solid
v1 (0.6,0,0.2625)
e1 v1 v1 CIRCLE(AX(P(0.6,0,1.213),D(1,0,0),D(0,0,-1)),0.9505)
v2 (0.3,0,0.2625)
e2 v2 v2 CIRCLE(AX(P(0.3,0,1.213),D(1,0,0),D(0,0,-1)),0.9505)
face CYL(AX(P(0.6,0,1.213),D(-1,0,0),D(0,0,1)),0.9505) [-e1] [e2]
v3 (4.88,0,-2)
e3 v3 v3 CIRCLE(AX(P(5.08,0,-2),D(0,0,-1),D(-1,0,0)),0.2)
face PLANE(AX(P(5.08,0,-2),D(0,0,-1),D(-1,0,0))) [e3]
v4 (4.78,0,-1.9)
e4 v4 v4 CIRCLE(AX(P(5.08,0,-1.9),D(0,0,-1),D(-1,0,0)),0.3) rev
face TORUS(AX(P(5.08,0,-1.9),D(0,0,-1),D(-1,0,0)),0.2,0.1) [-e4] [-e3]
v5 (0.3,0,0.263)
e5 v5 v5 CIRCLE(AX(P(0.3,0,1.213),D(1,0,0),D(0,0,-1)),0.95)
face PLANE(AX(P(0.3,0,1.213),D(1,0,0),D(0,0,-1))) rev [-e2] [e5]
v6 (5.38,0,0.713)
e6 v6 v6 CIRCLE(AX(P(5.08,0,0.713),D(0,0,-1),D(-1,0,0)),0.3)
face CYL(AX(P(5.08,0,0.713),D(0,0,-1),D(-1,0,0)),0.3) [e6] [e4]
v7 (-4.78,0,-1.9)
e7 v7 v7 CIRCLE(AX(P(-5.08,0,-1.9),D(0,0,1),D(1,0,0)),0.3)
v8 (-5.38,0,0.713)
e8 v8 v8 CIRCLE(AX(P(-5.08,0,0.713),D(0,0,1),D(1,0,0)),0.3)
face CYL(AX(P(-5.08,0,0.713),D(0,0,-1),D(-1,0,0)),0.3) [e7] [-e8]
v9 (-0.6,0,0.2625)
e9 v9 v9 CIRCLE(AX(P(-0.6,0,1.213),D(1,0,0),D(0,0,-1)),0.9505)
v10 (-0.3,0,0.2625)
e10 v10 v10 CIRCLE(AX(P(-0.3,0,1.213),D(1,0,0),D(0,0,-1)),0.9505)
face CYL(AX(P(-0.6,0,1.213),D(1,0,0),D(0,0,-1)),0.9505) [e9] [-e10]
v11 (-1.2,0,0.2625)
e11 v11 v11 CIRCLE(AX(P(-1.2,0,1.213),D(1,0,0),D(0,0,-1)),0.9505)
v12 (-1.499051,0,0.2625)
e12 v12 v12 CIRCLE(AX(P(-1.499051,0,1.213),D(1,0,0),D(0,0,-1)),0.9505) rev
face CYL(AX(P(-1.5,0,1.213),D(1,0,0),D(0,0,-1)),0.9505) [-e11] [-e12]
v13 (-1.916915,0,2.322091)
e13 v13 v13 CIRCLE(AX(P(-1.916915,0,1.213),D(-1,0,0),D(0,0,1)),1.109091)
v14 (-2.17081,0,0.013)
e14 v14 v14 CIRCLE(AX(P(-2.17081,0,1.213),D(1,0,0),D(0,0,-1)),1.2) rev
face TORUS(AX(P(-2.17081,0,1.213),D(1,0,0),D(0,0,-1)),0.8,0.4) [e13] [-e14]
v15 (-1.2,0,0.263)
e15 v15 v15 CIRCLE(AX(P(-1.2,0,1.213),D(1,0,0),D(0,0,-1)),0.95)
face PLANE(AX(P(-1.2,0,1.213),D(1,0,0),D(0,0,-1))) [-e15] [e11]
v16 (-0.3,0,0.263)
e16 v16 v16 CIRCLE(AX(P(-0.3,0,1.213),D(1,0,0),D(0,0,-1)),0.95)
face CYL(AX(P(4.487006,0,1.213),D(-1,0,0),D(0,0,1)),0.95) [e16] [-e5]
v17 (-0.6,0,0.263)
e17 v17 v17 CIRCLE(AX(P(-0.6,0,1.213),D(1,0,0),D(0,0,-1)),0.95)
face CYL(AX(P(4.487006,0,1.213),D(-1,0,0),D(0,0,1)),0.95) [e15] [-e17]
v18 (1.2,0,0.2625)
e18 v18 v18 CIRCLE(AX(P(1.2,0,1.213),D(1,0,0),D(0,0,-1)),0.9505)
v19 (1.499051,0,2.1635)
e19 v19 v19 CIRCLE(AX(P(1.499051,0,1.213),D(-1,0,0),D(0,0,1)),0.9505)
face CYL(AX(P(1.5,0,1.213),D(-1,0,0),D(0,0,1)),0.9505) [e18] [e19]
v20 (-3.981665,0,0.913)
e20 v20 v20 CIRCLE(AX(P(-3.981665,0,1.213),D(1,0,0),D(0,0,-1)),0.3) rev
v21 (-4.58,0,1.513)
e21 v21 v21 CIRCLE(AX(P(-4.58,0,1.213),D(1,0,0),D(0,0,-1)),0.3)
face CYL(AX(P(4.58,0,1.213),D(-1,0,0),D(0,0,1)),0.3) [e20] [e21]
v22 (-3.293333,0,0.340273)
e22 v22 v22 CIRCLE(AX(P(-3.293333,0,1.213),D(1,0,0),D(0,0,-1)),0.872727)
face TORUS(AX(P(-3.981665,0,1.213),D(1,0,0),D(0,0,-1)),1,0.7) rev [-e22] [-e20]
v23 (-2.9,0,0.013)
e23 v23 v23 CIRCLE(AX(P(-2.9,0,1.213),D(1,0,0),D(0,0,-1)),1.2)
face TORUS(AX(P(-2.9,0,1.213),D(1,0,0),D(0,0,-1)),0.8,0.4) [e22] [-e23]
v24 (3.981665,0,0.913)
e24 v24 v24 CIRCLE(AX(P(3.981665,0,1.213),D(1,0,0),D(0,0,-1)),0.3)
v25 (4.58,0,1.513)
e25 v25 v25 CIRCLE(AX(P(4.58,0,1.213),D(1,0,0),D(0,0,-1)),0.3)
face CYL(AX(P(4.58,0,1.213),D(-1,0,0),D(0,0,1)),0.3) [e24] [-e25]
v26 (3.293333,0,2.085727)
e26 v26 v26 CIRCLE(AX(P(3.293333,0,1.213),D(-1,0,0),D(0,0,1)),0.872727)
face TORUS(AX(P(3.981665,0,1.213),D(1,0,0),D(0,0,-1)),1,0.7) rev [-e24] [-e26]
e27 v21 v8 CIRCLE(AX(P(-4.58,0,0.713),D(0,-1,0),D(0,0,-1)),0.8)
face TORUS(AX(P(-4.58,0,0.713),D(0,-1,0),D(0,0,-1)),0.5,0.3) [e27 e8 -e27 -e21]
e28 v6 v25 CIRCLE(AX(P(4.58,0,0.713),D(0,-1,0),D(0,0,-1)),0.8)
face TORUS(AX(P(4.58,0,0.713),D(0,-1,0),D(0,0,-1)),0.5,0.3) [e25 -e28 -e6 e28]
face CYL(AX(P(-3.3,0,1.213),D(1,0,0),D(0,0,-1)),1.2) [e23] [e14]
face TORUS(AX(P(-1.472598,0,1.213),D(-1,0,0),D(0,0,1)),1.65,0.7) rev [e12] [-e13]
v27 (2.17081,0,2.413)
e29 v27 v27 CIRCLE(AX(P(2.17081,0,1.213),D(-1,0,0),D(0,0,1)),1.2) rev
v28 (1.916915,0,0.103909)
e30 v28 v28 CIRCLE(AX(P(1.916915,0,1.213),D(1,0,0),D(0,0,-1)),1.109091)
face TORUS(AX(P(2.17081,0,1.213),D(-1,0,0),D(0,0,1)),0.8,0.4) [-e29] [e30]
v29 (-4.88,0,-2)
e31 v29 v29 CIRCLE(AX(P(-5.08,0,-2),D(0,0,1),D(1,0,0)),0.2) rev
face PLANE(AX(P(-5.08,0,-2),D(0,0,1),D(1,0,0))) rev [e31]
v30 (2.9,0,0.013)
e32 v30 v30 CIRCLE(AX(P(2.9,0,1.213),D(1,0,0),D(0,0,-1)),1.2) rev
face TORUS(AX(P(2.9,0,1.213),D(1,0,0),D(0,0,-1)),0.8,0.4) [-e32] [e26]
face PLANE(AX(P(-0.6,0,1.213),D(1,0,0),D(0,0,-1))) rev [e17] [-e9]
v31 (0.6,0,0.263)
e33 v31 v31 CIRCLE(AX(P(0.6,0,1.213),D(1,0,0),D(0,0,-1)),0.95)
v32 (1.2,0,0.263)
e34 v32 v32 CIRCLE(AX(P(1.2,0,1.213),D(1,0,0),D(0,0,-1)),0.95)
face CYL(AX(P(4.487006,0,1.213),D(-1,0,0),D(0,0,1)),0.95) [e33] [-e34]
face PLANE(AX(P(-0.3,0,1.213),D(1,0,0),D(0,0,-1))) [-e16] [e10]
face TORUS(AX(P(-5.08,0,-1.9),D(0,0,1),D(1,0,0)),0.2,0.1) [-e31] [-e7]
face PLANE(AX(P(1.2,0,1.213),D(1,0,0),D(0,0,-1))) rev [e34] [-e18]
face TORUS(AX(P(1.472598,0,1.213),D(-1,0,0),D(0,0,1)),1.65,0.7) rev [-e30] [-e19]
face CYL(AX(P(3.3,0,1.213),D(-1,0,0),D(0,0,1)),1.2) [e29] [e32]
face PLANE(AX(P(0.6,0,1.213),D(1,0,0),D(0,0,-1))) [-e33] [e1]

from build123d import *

# Parameters (mm, degrees)
IZIM2_R                                 = 0.3000000000000001
RADYUS4_R                               = 0.1
Y_KSEKLIK_EKSTR_ZYON2_START             = 2.55
IZIM4_R                                 = 1.2
Y_KSEKLIK_EKSTR_ZYON2_DEPTH             = 0.75
Y_KSEKLIK_EKSTR_ZYON3_START             = -2.55
IZIM4_3_R                               = 1.2
Y_KSEKLIK_EKSTR_ZYON3_DEPTH             = 0.75
Y_KSEKLIK_EKSTR_ZYON4_REACH             = 8.017
IZIM4_4_R                               = 0.95
Y_KSEKLIK_EKSTR_ZYON4_DIRECTION_2_REACH = 8.017
RADYUS1_R                               = 0.4
RADYUS2_R                               = 0.7
RADYUS3_R                               = 0.7
EKSTR_ZYON_NCE1_START                   = 1.2
IZIM4_5_R                               = 0.9504999999999999
IZIM4_5_R_2                             = 0.8494999999999999
EKSTR_ZYON_NCE1_DEPTH                   = 0.3
EKSTR_ZYON_NCE2_START                   = 0.6
IZIM4_7_R                               = 0.9504999999999999
IZIM4_7_R_2                             = 0.8494999999999999
EKSTR_ZYON_NCE2_DEPTH                   = 0.3
EKSTR_ZYON_NCE3_START                   = -0.3
IZIM4_9_R                               = 0.9504999999999999
IZIM4_9_R_2                             = 0.8494999999999999
EKSTR_ZYON_NCE3_DEPTH                   = 0.3
EKSTR_ZYON_NCE4_START                   = -1.2
IZIM4_10_R                              = 0.9504999999999999
IZIM4_10_R_2                            = 0.8494999999999999
EKSTR_ZYON_NCE4_DEPTH                   = 0.3


with BuildPart() as part:
    # Süpür2: sweep along a path in Çizim3
    with BuildLine(Plane(origin=(0, 0, 0), x_dir=(1, 0, 0), z_dir=(0, 1, 0))) as s_p_r2_path:
        Line((5.080000000000001, 2.0000000000000355), (5.080000000000001, -0.7129999999999246))
        ThreePointArc((5.080000000000001, -0.7129999999999246), (4.9335533905933, -1.0665533905932438), (4.580000000000001, -1.2129999999999947))
        Line((4.580000000000001, -1.2129999999999947), (-4.580000000000001, -1.2129999999999959))
        ThreePointArc((-4.580000000000001, -1.2129999999999959), (-4.933553390593275, -1.0665533905932696), (-5.080000000000001, -0.712999999999996))
        Line((-5.080000000000001, -0.712999999999996), (-5.080000000000001, 1.9999999999999645))
    # Çizim2 → Süpür2 (sweep)
    with BuildSketch(Plane(origin=(0, 0, -2), x_dir=(-1, 0, 6.98e-15), z_dir=(-6.98e-15, 0, -1))):
        with Locations((-5.080000000000001, 0)):
            Circle(IZIM2_R)
    sweep(path=s_p_r2_path.line)

    # Radyus4
    radyus4_edges = [part.edges().sort_by_distance(p)[0] for p in [
        (5.380000000000001, -4e-17, -2.0000000000000355),
        (-5.380000000000001, -4e-17, -1.9999999999999645),
    ]]
    fillet(radyus4_edges, radius=RADYUS4_R)

    # Çizim4 → Yükseklik-Ekstrüzyon2 (add, symmetric)
    with BuildSketch(Plane(origin=(0, 0, 0), x_dir=(0, 0, -1), z_dir=(1, 0, 0)).offset(Y_KSEKLIK_EKSTR_ZYON2_START)):
        with Locations((-1.2129999999999959, 0)):
            Circle(IZIM4_R)
    extrude(amount=Y_KSEKLIK_EKSTR_ZYON2_DEPTH, both=True)

    # Çizim4<3> → Yükseklik-Ekstrüzyon3 (add, symmetric)
    with BuildSketch(Plane(origin=(0, 0, 0), x_dir=(0, 0, -1), z_dir=(1, 0, 0)).offset(Y_KSEKLIK_EKSTR_ZYON3_START)):
        with Locations((-1.2129999999999959, 0)):
            Circle(IZIM4_3_R)
    extrude(amount=Y_KSEKLIK_EKSTR_ZYON3_DEPTH, both=True)

    # Yükseklik-Ekstrüzyon4: up to this face of the body (flat: up to its plane)
    y_kseklik_ekstr_zyon4_end = Plane(part.part.faces().sort_by_distance((1.8, 0, 2.379058875))[0])
    # Çizim4<4> → Yükseklik-Ekstrüzyon4 (add, up to the picked face)
    with BuildSketch(Plane(origin=(0, 0, 0), x_dir=(0, 0, -1), z_dir=(1, 0, 0)), mode=Mode.PRIVATE) as y_kseklik_ekstr_zyon4_sk1:
        with Locations((-1.2129999999999959, 0)):
            Circle(IZIM4_4_R)
    y_kseklik_ekstr_zyon4_tool1 = split(extrude(y_kseklik_ekstr_zyon4_sk1.sketch, amount=Y_KSEKLIK_EKSTR_ZYON4_REACH, mode=Mode.PRIVATE), bisect_by=y_kseklik_ekstr_zyon4_end, keep=Keep.BOTH, mode=Mode.PRIVATE)
    add(y_kseklik_ekstr_zyon4_tool1.solids().sort_by(Axis((0, 0, 1.213), (1, 0, 0)))[0])

    # Yükseklik-Ekstrüzyon4 direction 2: up to this face of the body (flat: up to its plane)
    y_kseklik_ekstr_zyon4_direction_2_end = Plane(part.part.faces().sort_by_distance((-1.8, 0, 2.379058875))[0])
    # Çizim4<4> → Yükseklik-Ekstrüzyon4 direction 2 (add, up to the picked face)
    with BuildSketch(Plane(origin=(0, 0, 0), x_dir=(0, 0, -1), z_dir=(1, 0, 0)), mode=Mode.PRIVATE) as y_kseklik_ekstr_zyon4_direction_2_sk1:
        with Locations((-1.2129999999999959, 0)):
            Circle(IZIM4_4_R)
    y_kseklik_ekstr_zyon4_direction_2_tool1 = split(extrude(y_kseklik_ekstr_zyon4_direction_2_sk1.sketch, amount=-Y_KSEKLIK_EKSTR_ZYON4_DIRECTION_2_REACH, mode=Mode.PRIVATE), bisect_by=y_kseklik_ekstr_zyon4_direction_2_end, keep=Keep.BOTH, mode=Mode.PRIVATE)
    add(y_kseklik_ekstr_zyon4_direction_2_tool1.solids().sort_by(Axis((0, 0, 1.213), (-1, 0, 0)))[0])

    # Radyus1
    # the kernel refuses this fillet: 0.4 mm, written as the material it takes off along each edge
    with BuildSketch(Plane(origin=(3.3, 0, 1.2129999999999959), x_dir=(0, 0, -1), z_dir=(0, -1, 0))) as radyus1_piece_1:
        with BuildLine():
            CenterArc((1.2 - RADYUS1_R, -RADYUS1_R), RADYUS1_R, 0, 90)
            Line((1.2000000000000002, -RADYUS1_R), (1.2 + RADYUS1_R * 0.02, -RADYUS1_R))
            Line((1.2 + RADYUS1_R * 0.02, -RADYUS1_R), (1.2 + RADYUS1_R * 0.02, RADYUS1_R * 0.02))
            Line((1.2 + RADYUS1_R * 0.02, RADYUS1_R * 0.02), (1.2 - RADYUS1_R, RADYUS1_R * 0.02))
            Line((1.2 - RADYUS1_R, RADYUS1_R * 0.02), (1.2 - RADYUS1_R, 0))
        make_face()
    revolve(axis=Axis((3.3, 0, 1.2129999999999959), (1, 0, 0)), mode=Mode.SUBTRACT)
    with BuildSketch(Plane(origin=(1.7999999999999998, 0, 1.2129999999999959), x_dir=(0, 0, -1), z_dir=(0, -1, 0))) as radyus1_piece_2:
        with BuildLine():
            CenterArc((0.7999999999999999, 0.3708099243547833), RADYUS1_R, 292.02431283704215, 67.97568716295785)
            Line((0.95, 2.2e-16), (0.9529999999999998, -0.00741619848709552))
            ThreePointArc((0.9529999999999998, -0.00741619848709552), (1.075, -0.00800000000000001), (1.2, -0.00800000000000001))
            Line((1.2, -0.00800000000000001), (1.208, 0))
            Line((1.208, 0), (1.208, 0.3708099243547833))
            Line((1.208, 0.3708099243547833), (1.2, 0.3708099243547833))
        make_face()
    revolve(axis=Axis((1.7999999999999998, 0, 1.2129999999999959), (1, 0, 0)), mode=Mode.SUBTRACT)
    with BuildSketch(Plane(origin=(-1.7999999999999998, 0, 1.2129999999999959), x_dir=(0, 0, -1), z_dir=(0, -1, 0))) as radyus1_piece_3:
        with BuildLine():
            CenterArc((0.7999999999999999, -0.3708099243547833), RADYUS1_R, 0, 67.97568716295785)
            Line((1.2, -0.3708099243547833), (1.208, -0.3708099243547833))
            Line((1.208, -0.3708099243547833), (1.208, 0))
            Line((1.208, 0), (1.2, 0.00800000000000001))
            ThreePointArc((1.2, 0.00800000000000001), (1.075, 0.00800000000000001), (0.9529999999999998, 0.00741619848709552))
            Line((0.9529999999999998, 0.00741619848709552), (0.95, -2.2e-16))
        make_face()
    revolve(axis=Axis((-1.7999999999999998, 0, 1.2129999999999959), (1, 0, 0)), mode=Mode.SUBTRACT)
    with BuildSketch(Plane(origin=(-3.3, 0, 1.2129999999999959), x_dir=(0, 0, -1), z_dir=(0, -1, 0))) as radyus1_piece_4:
        with BuildLine():
            CenterArc((1.2 - RADYUS1_R, RADYUS1_R), RADYUS1_R, 270, 90)
            Line((1.2 - RADYUS1_R, 0), (1.2 - RADYUS1_R, -RADYUS1_R * 0.02))
            Line((1.2 - RADYUS1_R, -RADYUS1_R * 0.02), (1.2 + RADYUS1_R * 0.02, -RADYUS1_R * 0.02))
            Line((1.2 + RADYUS1_R * 0.02, -RADYUS1_R * 0.02), (1.2 + RADYUS1_R * 0.02, RADYUS1_R))
            Line((1.2 + RADYUS1_R * 0.02, RADYUS1_R), (1.2, RADYUS1_R))
        make_face()
    revolve(axis=Axis((-3.3, 0, 1.2129999999999959), (1, 0, 0)), mode=Mode.SUBTRACT)

    # Radyus2
    # the kernel refuses this fillet: 0.7 mm, written as the material it adds along each edge
    with BuildSketch(Plane(origin=(3.3, 0, 1.212999999999995), x_dir=(0, 0, -1), z_dir=(0, 1, 0))) as radyus2_piece_1:
        with BuildLine():
            CenterArc((1.0000000000000002, -0.6816653826391961), RADYUS2_R, 100.47568169639018, 79.52431830360979)
            Line((0.8727272727272696, 0.00666713358574667), (0.8599999999999965, 0.07550038520824076))
            ThreePointArc((0.8599999999999965, 0.07550038520824076), (0.7999999999999948, 0.06999999999999984), (0.30000000000000004, 0.06999999999999984))
            Line((0.30000000000000004, 0.06999999999999984), (0.2300000000000001, 0))
            Line((0.2300000000000001, 0), (0.23000000000000032, -0.6816653826391961))
            Line((0.23000000000000032, -0.6816653826391961), (0.30000000000000027, -0.6816653826391961))
        make_face()
    revolve(axis=Axis((3.3, 0, 1.212999999999995), (-1, 0, 2.2e-16)))
    with BuildSketch(Plane(origin=(-3.3, 0, 1.2129999999999965), x_dir=(0, 0, -1), z_dir=(0, 1, 0))) as radyus2_piece_2:
        with BuildLine():
            CenterArc((0.9999999999999998, 0.6816653826391965), RADYUS2_R, 180.00000000000009, 79.52431830360985)
            Line((0.2999999999999998, 0.6816653826391956), (0.22999999999999987, 0.6816653826391956))
            Line((0.22999999999999987, 0.6816653826391956), (0.2300000000000001, 0))
            Line((0.2300000000000001, 0), (0.30000000000000004, -0.06999999999999984))
            ThreePointArc((0.30000000000000004, -0.06999999999999984), (0.7999999999999963, -0.06999999999999984), (0.8599999999999974, -0.07550038520824032))
            Line((0.8599999999999974, -0.07550038520824032), (0.8727272727272704, -0.00666713358574622))
        make_face()
    revolve(axis=Axis((-3.3, 0, 1.2129999999999965), (-1, 0, 2.2e-16)))

    # Radyus3
    radyus3_edges = [part.edges().sort_by_distance(p)[0] for p in [
        (1.7999999999999998, -1.2e-16, 2.162999999999996),
        (-1.7999999999999998, 1.2e-16, 2.162999999999996),
    ]]
    fillet(radyus3_edges, radius=RADYUS3_R)

    # Çizim4<5> → Ekstrüzyon-İnce1 (add)
    with BuildSketch(Plane(origin=(0, 0, 0), x_dir=(0, 0, -1), z_dir=(1, 0, 0)).offset(EKSTR_ZYON_NCE1_START)):
        with Locations((-1.2129999999999959, 0)):
            Circle(IZIM4_5_R)
        with Locations((-1.2129999999999959, 0)):
            Circle(IZIM4_5_R_2, mode=Mode.SUBTRACT)
    extrude(amount=-EKSTR_ZYON_NCE1_DEPTH)

    # Çizim4<7> → Ekstrüzyon-İnce2 (add)
    with BuildSketch(Plane(origin=(0, 0, 0), x_dir=(0, 0, -1), z_dir=(1, 0, 0)).offset(EKSTR_ZYON_NCE2_START)):
        with Locations((-1.2129999999999959, 0)):
            Circle(IZIM4_7_R)
        with Locations((-1.2129999999999959, 0)):
            Circle(IZIM4_7_R_2, mode=Mode.SUBTRACT)
    extrude(amount=-EKSTR_ZYON_NCE2_DEPTH)

    # Çizim4<9> → Ekstrüzyon-İnce3 (add)
    with BuildSketch(Plane(origin=(0, 0, 0), x_dir=(0, 0, -1), z_dir=(1, 0, 0)).offset(EKSTR_ZYON_NCE3_START)):
        with Locations((-1.2129999999999959, 0)):
            Circle(IZIM4_9_R)
        with Locations((-1.2129999999999959, 0)):
            Circle(IZIM4_9_R_2, mode=Mode.SUBTRACT)
    extrude(amount=-EKSTR_ZYON_NCE3_DEPTH)

    # Çizim4<10> → Ekstrüzyon-İnce4 (add)
    with BuildSketch(Plane(origin=(0, 0, 0), x_dir=(0, 0, -1), z_dir=(1, 0, 0)).offset(EKSTR_ZYON_NCE4_START)):
        with Locations((-1.2129999999999959, 0)):
            Circle(IZIM4_10_R)
        with Locations((-1.2129999999999959, 0)):
            Circle(IZIM4_10_R_2, mode=Mode.SUBTRACT)
    extrude(amount=-EKSTR_ZYON_NCE4_DEPTH)


solid = part.part
